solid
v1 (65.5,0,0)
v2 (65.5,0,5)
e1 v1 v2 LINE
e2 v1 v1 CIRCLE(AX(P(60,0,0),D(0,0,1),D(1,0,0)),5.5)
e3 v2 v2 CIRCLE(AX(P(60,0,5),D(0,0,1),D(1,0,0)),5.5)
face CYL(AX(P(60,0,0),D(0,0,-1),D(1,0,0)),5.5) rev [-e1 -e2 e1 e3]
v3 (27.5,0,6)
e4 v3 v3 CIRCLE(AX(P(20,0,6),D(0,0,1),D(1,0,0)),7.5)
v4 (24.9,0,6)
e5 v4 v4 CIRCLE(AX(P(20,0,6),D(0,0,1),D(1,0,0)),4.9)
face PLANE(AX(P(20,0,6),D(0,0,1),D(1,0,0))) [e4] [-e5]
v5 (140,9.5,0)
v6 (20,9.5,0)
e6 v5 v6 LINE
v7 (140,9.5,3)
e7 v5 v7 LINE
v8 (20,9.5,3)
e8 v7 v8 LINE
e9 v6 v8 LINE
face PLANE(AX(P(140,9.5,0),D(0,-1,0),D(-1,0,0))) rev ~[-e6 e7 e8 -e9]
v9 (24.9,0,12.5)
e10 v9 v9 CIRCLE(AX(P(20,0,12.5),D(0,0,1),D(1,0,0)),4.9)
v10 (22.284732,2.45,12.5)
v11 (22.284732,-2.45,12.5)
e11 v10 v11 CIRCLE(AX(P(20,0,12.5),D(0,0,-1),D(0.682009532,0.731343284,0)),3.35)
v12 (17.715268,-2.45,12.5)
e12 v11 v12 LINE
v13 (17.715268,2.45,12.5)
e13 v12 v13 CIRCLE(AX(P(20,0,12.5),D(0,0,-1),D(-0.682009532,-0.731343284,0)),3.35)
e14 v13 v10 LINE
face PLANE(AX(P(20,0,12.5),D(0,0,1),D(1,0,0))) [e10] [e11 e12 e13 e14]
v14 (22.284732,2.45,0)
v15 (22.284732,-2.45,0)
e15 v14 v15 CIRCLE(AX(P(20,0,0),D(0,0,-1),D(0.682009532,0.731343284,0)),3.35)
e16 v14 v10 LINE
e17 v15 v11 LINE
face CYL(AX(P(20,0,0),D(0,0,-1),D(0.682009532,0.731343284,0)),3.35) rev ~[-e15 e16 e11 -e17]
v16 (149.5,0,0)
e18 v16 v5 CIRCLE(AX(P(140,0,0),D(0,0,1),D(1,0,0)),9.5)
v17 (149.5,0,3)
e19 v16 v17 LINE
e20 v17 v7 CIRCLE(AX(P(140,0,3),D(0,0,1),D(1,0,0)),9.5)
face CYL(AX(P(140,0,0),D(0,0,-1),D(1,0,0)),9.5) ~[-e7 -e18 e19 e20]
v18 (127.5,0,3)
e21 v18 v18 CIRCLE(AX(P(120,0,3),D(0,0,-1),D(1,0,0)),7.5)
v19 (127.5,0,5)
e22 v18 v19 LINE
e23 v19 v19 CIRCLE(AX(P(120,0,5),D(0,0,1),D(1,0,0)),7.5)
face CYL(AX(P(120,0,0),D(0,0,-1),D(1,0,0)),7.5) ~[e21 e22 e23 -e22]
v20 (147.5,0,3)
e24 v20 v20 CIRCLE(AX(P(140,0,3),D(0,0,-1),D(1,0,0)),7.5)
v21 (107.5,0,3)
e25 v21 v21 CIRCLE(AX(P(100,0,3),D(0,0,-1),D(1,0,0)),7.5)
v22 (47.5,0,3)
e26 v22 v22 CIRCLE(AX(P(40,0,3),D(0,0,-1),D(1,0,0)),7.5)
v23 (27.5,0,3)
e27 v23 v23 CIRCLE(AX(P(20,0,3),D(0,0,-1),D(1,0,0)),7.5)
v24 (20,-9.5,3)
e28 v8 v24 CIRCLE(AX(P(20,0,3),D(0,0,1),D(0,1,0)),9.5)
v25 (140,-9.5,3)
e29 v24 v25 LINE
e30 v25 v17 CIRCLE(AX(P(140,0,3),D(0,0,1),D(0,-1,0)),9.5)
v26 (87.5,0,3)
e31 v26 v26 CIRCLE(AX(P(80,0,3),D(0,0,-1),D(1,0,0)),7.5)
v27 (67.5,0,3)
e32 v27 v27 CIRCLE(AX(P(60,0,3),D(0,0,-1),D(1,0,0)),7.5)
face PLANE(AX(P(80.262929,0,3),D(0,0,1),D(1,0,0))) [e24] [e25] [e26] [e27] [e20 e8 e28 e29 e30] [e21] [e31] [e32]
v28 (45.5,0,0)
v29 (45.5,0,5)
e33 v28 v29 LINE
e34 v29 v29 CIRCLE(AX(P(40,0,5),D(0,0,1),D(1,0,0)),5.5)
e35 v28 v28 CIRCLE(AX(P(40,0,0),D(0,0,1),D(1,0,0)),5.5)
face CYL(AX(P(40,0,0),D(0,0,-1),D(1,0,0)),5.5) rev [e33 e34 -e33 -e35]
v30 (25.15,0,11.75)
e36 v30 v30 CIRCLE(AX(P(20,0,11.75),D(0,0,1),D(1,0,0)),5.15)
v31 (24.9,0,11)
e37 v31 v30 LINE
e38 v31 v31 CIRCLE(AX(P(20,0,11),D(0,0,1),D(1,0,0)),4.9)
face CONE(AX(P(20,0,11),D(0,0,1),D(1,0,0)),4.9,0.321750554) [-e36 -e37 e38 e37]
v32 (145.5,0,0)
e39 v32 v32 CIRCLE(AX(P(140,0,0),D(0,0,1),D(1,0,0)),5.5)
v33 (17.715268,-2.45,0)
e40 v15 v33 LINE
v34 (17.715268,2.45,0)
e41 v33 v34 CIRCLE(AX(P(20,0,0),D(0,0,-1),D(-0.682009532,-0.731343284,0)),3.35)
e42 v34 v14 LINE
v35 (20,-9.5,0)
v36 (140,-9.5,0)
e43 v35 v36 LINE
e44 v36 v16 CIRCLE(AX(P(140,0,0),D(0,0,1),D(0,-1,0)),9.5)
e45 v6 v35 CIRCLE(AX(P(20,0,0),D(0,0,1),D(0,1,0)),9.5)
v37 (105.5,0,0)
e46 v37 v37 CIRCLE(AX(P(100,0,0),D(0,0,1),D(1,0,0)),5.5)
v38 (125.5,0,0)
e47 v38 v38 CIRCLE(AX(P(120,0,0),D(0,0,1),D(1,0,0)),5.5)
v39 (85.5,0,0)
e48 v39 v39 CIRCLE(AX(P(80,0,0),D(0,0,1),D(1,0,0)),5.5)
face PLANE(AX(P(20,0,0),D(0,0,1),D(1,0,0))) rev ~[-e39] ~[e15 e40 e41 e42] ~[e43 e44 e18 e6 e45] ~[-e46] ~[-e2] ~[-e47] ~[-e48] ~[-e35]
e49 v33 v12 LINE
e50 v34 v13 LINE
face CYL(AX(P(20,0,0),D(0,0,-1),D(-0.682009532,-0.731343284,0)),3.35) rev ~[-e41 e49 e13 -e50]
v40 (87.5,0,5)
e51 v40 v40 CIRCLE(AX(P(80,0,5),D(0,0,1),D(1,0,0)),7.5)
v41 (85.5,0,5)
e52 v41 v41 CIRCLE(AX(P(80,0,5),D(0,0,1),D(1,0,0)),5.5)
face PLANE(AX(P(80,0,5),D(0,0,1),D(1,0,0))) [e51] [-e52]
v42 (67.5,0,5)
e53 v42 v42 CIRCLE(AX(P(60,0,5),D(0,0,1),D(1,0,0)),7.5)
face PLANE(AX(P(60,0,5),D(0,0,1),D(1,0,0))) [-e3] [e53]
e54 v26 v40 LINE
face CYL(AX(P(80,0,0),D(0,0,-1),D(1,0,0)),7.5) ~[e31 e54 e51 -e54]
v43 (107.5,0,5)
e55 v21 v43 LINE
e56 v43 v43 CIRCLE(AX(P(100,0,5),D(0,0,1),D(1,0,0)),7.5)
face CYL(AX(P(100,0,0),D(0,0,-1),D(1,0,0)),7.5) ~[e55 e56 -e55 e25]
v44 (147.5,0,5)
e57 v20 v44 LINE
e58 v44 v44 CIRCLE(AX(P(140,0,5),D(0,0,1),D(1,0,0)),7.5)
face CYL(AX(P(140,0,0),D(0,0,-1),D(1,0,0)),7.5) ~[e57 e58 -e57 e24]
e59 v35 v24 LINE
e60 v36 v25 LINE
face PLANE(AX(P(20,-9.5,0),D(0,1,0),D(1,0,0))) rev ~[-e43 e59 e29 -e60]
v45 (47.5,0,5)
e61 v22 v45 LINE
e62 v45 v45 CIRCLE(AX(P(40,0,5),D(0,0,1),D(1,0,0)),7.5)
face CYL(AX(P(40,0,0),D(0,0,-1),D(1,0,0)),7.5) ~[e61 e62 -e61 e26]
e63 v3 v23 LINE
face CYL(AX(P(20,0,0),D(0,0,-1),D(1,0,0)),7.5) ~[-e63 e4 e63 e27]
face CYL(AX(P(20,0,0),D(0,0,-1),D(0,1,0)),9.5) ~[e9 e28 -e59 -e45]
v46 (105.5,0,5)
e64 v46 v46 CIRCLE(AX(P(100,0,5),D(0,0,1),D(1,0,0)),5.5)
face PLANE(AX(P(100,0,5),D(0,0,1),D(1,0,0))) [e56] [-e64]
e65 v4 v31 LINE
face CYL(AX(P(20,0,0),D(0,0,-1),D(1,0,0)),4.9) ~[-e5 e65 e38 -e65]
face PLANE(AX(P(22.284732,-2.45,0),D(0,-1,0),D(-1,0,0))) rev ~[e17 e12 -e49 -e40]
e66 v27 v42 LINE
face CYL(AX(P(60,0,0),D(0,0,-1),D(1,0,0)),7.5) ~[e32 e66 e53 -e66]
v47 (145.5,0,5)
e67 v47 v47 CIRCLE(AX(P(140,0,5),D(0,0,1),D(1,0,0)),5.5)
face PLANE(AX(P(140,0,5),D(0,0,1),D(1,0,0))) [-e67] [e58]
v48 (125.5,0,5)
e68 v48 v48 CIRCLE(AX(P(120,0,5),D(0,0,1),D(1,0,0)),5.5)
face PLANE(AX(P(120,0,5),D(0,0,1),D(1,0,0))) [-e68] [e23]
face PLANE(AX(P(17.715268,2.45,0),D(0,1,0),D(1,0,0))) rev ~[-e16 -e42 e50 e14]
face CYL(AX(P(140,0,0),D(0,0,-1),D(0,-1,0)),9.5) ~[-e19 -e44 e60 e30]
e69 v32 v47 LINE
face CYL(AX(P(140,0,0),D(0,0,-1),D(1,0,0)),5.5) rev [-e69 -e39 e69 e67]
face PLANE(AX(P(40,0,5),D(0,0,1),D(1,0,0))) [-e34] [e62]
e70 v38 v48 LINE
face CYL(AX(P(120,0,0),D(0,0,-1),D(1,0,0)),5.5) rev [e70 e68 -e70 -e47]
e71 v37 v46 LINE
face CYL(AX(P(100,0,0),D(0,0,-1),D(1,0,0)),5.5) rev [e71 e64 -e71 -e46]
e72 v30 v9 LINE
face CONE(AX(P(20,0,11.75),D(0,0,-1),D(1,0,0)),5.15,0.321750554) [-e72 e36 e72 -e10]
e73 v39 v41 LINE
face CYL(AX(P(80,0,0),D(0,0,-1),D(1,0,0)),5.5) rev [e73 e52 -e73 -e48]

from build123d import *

# Parameters (mm, degrees)
F2_R     = 7.5
F2_R_2   = 5.5
F3_DEPTH = 3
F4_DEPTH = 5
F5_DEPTH = 5
F2_R_3   = 4.9
F6_DEPTH = 6
F7_DEPTH = 12.5


# Not quite as in the source:
# - a feature names something its author has since deleted; it is built from what else it names


with BuildPart() as f3:
    # F2 (on Top) → F3 (new body)
    with BuildSketch(Plane.XY):
        with BuildLine():
            Line((140, 9.5), (20, 9.5))
            ThreePointArc((20, 9.5), (10.5, 0), (20, -9.5))
            Line((20, -9.5), (140, -9.5))
            ThreePointArc((140, -9.5), (146.7175144213, -6.7175144213), (149.5, 0))
            ThreePointArc((149.5, 0), (146.7175144213, 6.7175144213), (140, 9.5))
        make_face()
        with Locations((20, 0)):
            Circle(F2_R, mode=Mode.SUBTRACT)
        with Locations((40, 0)):
            Circle(F2_R, mode=Mode.SUBTRACT)
        with Locations((60, 0)):
            Circle(F2_R, mode=Mode.SUBTRACT)
        with Locations((80, 0)):
            Circle(F2_R, mode=Mode.SUBTRACT)
        with Locations((100, 0)):
            Circle(F2_R, mode=Mode.SUBTRACT)
        with Locations((120, 0)):
            Circle(F2_R, mode=Mode.SUBTRACT)
        with Locations((140, 0)):
            Circle(F2_R, mode=Mode.SUBTRACT)
        with Locations((20, 0)):
            Circle(F2_R)
        with Locations((20, 0)):
            Circle(F2_R_2, mode=Mode.SUBTRACT)
        with Locations((40, 0)):
            Circle(F2_R)
        with Locations((40, 0)):
            Circle(F2_R_2, mode=Mode.SUBTRACT)
        with Locations((60, 0)):
            Circle(F2_R)
        with Locations((60, 0)):
            Circle(F2_R_2, mode=Mode.SUBTRACT)
        with Locations((80, 0)):
            Circle(F2_R)
        with Locations((80, 0)):
            Circle(F2_R_2, mode=Mode.SUBTRACT)
        with Locations((100, 0)):
            Circle(F2_R)
        with Locations((100, 0)):
            Circle(F2_R_2, mode=Mode.SUBTRACT)
        with Locations((120, 0)):
            Circle(F2_R)
        with Locations((120, 0)):
            Circle(F2_R_2, mode=Mode.SUBTRACT)
        with Locations((140, 0)):
            Circle(F2_R)
        with Locations((140, 0)):
            Circle(F2_R_2, mode=Mode.SUBTRACT)
    extrude(amount=F3_DEPTH)

    # F2 (on Top) → F4 (join)
    with BuildSketch(Plane.XY):
        with Locations((20, 0)):
            Circle(F2_R)
        with Locations((20, 0)):
            Circle(F2_R_2, mode=Mode.SUBTRACT)
        with Locations((40, 0)):
            Circle(F2_R)
        with Locations((40, 0)):
            Circle(F2_R_2, mode=Mode.SUBTRACT)
        with Locations((60, 0)):
            Circle(F2_R)
        with Locations((60, 0)):
            Circle(F2_R_2, mode=Mode.SUBTRACT)
        with Locations((80, 0)):
            Circle(F2_R)
        with Locations((80, 0)):
            Circle(F2_R_2, mode=Mode.SUBTRACT)
        with Locations((100, 0)):
            Circle(F2_R)
        with Locations((100, 0)):
            Circle(F2_R_2, mode=Mode.SUBTRACT)
        with Locations((120, 0)):
            Circle(F2_R)
        with Locations((120, 0)):
            Circle(F2_R_2, mode=Mode.SUBTRACT)
        with Locations((140, 0)):
            Circle(F2_R)
        with Locations((140, 0)):
            Circle(F2_R_2, mode=Mode.SUBTRACT)
    extrude(amount=F4_DEPTH)

    # F2 (on Top) → F5 (join)
    with BuildSketch(Plane.XY):
        with Locations((140, 0)):
            Circle(F2_R)
        with Locations((140, 0)):
            Circle(F2_R_2, mode=Mode.SUBTRACT)
    extrude(amount=F5_DEPTH)

    # F2 (on Top) → F6 (join)
    with BuildSketch(Plane.XY):
        with Locations((20, 0)):
            Circle(F2_R)
        with Locations((20, 0)):
            Circle(F2_R_2, mode=Mode.SUBTRACT)
        with Locations((20, 0)):
            Circle(F2_R_2)
        with Locations((20, 0)):
            Circle(F2_R_3, mode=Mode.SUBTRACT)
    extrude(amount=F6_DEPTH)

    # F2 (on Top) → F7 (join)
    with BuildSketch(Plane.XY):
        with Locations((20, 0)):
            Circle(F2_R_3)
        with BuildLine():
            Line((22.2847319318, -2.45), (20, -2.45))
            Line((20, -2.45), (17.7152680682, -2.45))
            ThreePointArc((17.7152680682, -2.45), (16.65, 0), (17.7152680682, 2.45))
            Line((17.7152680682, 2.45), (20, 2.45))
            Line((20, 2.45), (22.2847319318, 2.45))
            ThreePointArc((22.2847319318, 2.45), (23.35, 0), (22.2847319318, -2.45))
        make_face(mode=Mode.SUBTRACT)
    extrude(amount=F7_DEPTH)

    # F9 (on plane+point) → F10 (revolve)
    with BuildSketch(Plane.XZ):
        Polygon((25.15, 11.75), (24.9, 12.5), (24.9, 11), align=None)
    revolve(axis=Axis((20, 0, 6.25), (0, 0, 1)))


solid = f3.part
